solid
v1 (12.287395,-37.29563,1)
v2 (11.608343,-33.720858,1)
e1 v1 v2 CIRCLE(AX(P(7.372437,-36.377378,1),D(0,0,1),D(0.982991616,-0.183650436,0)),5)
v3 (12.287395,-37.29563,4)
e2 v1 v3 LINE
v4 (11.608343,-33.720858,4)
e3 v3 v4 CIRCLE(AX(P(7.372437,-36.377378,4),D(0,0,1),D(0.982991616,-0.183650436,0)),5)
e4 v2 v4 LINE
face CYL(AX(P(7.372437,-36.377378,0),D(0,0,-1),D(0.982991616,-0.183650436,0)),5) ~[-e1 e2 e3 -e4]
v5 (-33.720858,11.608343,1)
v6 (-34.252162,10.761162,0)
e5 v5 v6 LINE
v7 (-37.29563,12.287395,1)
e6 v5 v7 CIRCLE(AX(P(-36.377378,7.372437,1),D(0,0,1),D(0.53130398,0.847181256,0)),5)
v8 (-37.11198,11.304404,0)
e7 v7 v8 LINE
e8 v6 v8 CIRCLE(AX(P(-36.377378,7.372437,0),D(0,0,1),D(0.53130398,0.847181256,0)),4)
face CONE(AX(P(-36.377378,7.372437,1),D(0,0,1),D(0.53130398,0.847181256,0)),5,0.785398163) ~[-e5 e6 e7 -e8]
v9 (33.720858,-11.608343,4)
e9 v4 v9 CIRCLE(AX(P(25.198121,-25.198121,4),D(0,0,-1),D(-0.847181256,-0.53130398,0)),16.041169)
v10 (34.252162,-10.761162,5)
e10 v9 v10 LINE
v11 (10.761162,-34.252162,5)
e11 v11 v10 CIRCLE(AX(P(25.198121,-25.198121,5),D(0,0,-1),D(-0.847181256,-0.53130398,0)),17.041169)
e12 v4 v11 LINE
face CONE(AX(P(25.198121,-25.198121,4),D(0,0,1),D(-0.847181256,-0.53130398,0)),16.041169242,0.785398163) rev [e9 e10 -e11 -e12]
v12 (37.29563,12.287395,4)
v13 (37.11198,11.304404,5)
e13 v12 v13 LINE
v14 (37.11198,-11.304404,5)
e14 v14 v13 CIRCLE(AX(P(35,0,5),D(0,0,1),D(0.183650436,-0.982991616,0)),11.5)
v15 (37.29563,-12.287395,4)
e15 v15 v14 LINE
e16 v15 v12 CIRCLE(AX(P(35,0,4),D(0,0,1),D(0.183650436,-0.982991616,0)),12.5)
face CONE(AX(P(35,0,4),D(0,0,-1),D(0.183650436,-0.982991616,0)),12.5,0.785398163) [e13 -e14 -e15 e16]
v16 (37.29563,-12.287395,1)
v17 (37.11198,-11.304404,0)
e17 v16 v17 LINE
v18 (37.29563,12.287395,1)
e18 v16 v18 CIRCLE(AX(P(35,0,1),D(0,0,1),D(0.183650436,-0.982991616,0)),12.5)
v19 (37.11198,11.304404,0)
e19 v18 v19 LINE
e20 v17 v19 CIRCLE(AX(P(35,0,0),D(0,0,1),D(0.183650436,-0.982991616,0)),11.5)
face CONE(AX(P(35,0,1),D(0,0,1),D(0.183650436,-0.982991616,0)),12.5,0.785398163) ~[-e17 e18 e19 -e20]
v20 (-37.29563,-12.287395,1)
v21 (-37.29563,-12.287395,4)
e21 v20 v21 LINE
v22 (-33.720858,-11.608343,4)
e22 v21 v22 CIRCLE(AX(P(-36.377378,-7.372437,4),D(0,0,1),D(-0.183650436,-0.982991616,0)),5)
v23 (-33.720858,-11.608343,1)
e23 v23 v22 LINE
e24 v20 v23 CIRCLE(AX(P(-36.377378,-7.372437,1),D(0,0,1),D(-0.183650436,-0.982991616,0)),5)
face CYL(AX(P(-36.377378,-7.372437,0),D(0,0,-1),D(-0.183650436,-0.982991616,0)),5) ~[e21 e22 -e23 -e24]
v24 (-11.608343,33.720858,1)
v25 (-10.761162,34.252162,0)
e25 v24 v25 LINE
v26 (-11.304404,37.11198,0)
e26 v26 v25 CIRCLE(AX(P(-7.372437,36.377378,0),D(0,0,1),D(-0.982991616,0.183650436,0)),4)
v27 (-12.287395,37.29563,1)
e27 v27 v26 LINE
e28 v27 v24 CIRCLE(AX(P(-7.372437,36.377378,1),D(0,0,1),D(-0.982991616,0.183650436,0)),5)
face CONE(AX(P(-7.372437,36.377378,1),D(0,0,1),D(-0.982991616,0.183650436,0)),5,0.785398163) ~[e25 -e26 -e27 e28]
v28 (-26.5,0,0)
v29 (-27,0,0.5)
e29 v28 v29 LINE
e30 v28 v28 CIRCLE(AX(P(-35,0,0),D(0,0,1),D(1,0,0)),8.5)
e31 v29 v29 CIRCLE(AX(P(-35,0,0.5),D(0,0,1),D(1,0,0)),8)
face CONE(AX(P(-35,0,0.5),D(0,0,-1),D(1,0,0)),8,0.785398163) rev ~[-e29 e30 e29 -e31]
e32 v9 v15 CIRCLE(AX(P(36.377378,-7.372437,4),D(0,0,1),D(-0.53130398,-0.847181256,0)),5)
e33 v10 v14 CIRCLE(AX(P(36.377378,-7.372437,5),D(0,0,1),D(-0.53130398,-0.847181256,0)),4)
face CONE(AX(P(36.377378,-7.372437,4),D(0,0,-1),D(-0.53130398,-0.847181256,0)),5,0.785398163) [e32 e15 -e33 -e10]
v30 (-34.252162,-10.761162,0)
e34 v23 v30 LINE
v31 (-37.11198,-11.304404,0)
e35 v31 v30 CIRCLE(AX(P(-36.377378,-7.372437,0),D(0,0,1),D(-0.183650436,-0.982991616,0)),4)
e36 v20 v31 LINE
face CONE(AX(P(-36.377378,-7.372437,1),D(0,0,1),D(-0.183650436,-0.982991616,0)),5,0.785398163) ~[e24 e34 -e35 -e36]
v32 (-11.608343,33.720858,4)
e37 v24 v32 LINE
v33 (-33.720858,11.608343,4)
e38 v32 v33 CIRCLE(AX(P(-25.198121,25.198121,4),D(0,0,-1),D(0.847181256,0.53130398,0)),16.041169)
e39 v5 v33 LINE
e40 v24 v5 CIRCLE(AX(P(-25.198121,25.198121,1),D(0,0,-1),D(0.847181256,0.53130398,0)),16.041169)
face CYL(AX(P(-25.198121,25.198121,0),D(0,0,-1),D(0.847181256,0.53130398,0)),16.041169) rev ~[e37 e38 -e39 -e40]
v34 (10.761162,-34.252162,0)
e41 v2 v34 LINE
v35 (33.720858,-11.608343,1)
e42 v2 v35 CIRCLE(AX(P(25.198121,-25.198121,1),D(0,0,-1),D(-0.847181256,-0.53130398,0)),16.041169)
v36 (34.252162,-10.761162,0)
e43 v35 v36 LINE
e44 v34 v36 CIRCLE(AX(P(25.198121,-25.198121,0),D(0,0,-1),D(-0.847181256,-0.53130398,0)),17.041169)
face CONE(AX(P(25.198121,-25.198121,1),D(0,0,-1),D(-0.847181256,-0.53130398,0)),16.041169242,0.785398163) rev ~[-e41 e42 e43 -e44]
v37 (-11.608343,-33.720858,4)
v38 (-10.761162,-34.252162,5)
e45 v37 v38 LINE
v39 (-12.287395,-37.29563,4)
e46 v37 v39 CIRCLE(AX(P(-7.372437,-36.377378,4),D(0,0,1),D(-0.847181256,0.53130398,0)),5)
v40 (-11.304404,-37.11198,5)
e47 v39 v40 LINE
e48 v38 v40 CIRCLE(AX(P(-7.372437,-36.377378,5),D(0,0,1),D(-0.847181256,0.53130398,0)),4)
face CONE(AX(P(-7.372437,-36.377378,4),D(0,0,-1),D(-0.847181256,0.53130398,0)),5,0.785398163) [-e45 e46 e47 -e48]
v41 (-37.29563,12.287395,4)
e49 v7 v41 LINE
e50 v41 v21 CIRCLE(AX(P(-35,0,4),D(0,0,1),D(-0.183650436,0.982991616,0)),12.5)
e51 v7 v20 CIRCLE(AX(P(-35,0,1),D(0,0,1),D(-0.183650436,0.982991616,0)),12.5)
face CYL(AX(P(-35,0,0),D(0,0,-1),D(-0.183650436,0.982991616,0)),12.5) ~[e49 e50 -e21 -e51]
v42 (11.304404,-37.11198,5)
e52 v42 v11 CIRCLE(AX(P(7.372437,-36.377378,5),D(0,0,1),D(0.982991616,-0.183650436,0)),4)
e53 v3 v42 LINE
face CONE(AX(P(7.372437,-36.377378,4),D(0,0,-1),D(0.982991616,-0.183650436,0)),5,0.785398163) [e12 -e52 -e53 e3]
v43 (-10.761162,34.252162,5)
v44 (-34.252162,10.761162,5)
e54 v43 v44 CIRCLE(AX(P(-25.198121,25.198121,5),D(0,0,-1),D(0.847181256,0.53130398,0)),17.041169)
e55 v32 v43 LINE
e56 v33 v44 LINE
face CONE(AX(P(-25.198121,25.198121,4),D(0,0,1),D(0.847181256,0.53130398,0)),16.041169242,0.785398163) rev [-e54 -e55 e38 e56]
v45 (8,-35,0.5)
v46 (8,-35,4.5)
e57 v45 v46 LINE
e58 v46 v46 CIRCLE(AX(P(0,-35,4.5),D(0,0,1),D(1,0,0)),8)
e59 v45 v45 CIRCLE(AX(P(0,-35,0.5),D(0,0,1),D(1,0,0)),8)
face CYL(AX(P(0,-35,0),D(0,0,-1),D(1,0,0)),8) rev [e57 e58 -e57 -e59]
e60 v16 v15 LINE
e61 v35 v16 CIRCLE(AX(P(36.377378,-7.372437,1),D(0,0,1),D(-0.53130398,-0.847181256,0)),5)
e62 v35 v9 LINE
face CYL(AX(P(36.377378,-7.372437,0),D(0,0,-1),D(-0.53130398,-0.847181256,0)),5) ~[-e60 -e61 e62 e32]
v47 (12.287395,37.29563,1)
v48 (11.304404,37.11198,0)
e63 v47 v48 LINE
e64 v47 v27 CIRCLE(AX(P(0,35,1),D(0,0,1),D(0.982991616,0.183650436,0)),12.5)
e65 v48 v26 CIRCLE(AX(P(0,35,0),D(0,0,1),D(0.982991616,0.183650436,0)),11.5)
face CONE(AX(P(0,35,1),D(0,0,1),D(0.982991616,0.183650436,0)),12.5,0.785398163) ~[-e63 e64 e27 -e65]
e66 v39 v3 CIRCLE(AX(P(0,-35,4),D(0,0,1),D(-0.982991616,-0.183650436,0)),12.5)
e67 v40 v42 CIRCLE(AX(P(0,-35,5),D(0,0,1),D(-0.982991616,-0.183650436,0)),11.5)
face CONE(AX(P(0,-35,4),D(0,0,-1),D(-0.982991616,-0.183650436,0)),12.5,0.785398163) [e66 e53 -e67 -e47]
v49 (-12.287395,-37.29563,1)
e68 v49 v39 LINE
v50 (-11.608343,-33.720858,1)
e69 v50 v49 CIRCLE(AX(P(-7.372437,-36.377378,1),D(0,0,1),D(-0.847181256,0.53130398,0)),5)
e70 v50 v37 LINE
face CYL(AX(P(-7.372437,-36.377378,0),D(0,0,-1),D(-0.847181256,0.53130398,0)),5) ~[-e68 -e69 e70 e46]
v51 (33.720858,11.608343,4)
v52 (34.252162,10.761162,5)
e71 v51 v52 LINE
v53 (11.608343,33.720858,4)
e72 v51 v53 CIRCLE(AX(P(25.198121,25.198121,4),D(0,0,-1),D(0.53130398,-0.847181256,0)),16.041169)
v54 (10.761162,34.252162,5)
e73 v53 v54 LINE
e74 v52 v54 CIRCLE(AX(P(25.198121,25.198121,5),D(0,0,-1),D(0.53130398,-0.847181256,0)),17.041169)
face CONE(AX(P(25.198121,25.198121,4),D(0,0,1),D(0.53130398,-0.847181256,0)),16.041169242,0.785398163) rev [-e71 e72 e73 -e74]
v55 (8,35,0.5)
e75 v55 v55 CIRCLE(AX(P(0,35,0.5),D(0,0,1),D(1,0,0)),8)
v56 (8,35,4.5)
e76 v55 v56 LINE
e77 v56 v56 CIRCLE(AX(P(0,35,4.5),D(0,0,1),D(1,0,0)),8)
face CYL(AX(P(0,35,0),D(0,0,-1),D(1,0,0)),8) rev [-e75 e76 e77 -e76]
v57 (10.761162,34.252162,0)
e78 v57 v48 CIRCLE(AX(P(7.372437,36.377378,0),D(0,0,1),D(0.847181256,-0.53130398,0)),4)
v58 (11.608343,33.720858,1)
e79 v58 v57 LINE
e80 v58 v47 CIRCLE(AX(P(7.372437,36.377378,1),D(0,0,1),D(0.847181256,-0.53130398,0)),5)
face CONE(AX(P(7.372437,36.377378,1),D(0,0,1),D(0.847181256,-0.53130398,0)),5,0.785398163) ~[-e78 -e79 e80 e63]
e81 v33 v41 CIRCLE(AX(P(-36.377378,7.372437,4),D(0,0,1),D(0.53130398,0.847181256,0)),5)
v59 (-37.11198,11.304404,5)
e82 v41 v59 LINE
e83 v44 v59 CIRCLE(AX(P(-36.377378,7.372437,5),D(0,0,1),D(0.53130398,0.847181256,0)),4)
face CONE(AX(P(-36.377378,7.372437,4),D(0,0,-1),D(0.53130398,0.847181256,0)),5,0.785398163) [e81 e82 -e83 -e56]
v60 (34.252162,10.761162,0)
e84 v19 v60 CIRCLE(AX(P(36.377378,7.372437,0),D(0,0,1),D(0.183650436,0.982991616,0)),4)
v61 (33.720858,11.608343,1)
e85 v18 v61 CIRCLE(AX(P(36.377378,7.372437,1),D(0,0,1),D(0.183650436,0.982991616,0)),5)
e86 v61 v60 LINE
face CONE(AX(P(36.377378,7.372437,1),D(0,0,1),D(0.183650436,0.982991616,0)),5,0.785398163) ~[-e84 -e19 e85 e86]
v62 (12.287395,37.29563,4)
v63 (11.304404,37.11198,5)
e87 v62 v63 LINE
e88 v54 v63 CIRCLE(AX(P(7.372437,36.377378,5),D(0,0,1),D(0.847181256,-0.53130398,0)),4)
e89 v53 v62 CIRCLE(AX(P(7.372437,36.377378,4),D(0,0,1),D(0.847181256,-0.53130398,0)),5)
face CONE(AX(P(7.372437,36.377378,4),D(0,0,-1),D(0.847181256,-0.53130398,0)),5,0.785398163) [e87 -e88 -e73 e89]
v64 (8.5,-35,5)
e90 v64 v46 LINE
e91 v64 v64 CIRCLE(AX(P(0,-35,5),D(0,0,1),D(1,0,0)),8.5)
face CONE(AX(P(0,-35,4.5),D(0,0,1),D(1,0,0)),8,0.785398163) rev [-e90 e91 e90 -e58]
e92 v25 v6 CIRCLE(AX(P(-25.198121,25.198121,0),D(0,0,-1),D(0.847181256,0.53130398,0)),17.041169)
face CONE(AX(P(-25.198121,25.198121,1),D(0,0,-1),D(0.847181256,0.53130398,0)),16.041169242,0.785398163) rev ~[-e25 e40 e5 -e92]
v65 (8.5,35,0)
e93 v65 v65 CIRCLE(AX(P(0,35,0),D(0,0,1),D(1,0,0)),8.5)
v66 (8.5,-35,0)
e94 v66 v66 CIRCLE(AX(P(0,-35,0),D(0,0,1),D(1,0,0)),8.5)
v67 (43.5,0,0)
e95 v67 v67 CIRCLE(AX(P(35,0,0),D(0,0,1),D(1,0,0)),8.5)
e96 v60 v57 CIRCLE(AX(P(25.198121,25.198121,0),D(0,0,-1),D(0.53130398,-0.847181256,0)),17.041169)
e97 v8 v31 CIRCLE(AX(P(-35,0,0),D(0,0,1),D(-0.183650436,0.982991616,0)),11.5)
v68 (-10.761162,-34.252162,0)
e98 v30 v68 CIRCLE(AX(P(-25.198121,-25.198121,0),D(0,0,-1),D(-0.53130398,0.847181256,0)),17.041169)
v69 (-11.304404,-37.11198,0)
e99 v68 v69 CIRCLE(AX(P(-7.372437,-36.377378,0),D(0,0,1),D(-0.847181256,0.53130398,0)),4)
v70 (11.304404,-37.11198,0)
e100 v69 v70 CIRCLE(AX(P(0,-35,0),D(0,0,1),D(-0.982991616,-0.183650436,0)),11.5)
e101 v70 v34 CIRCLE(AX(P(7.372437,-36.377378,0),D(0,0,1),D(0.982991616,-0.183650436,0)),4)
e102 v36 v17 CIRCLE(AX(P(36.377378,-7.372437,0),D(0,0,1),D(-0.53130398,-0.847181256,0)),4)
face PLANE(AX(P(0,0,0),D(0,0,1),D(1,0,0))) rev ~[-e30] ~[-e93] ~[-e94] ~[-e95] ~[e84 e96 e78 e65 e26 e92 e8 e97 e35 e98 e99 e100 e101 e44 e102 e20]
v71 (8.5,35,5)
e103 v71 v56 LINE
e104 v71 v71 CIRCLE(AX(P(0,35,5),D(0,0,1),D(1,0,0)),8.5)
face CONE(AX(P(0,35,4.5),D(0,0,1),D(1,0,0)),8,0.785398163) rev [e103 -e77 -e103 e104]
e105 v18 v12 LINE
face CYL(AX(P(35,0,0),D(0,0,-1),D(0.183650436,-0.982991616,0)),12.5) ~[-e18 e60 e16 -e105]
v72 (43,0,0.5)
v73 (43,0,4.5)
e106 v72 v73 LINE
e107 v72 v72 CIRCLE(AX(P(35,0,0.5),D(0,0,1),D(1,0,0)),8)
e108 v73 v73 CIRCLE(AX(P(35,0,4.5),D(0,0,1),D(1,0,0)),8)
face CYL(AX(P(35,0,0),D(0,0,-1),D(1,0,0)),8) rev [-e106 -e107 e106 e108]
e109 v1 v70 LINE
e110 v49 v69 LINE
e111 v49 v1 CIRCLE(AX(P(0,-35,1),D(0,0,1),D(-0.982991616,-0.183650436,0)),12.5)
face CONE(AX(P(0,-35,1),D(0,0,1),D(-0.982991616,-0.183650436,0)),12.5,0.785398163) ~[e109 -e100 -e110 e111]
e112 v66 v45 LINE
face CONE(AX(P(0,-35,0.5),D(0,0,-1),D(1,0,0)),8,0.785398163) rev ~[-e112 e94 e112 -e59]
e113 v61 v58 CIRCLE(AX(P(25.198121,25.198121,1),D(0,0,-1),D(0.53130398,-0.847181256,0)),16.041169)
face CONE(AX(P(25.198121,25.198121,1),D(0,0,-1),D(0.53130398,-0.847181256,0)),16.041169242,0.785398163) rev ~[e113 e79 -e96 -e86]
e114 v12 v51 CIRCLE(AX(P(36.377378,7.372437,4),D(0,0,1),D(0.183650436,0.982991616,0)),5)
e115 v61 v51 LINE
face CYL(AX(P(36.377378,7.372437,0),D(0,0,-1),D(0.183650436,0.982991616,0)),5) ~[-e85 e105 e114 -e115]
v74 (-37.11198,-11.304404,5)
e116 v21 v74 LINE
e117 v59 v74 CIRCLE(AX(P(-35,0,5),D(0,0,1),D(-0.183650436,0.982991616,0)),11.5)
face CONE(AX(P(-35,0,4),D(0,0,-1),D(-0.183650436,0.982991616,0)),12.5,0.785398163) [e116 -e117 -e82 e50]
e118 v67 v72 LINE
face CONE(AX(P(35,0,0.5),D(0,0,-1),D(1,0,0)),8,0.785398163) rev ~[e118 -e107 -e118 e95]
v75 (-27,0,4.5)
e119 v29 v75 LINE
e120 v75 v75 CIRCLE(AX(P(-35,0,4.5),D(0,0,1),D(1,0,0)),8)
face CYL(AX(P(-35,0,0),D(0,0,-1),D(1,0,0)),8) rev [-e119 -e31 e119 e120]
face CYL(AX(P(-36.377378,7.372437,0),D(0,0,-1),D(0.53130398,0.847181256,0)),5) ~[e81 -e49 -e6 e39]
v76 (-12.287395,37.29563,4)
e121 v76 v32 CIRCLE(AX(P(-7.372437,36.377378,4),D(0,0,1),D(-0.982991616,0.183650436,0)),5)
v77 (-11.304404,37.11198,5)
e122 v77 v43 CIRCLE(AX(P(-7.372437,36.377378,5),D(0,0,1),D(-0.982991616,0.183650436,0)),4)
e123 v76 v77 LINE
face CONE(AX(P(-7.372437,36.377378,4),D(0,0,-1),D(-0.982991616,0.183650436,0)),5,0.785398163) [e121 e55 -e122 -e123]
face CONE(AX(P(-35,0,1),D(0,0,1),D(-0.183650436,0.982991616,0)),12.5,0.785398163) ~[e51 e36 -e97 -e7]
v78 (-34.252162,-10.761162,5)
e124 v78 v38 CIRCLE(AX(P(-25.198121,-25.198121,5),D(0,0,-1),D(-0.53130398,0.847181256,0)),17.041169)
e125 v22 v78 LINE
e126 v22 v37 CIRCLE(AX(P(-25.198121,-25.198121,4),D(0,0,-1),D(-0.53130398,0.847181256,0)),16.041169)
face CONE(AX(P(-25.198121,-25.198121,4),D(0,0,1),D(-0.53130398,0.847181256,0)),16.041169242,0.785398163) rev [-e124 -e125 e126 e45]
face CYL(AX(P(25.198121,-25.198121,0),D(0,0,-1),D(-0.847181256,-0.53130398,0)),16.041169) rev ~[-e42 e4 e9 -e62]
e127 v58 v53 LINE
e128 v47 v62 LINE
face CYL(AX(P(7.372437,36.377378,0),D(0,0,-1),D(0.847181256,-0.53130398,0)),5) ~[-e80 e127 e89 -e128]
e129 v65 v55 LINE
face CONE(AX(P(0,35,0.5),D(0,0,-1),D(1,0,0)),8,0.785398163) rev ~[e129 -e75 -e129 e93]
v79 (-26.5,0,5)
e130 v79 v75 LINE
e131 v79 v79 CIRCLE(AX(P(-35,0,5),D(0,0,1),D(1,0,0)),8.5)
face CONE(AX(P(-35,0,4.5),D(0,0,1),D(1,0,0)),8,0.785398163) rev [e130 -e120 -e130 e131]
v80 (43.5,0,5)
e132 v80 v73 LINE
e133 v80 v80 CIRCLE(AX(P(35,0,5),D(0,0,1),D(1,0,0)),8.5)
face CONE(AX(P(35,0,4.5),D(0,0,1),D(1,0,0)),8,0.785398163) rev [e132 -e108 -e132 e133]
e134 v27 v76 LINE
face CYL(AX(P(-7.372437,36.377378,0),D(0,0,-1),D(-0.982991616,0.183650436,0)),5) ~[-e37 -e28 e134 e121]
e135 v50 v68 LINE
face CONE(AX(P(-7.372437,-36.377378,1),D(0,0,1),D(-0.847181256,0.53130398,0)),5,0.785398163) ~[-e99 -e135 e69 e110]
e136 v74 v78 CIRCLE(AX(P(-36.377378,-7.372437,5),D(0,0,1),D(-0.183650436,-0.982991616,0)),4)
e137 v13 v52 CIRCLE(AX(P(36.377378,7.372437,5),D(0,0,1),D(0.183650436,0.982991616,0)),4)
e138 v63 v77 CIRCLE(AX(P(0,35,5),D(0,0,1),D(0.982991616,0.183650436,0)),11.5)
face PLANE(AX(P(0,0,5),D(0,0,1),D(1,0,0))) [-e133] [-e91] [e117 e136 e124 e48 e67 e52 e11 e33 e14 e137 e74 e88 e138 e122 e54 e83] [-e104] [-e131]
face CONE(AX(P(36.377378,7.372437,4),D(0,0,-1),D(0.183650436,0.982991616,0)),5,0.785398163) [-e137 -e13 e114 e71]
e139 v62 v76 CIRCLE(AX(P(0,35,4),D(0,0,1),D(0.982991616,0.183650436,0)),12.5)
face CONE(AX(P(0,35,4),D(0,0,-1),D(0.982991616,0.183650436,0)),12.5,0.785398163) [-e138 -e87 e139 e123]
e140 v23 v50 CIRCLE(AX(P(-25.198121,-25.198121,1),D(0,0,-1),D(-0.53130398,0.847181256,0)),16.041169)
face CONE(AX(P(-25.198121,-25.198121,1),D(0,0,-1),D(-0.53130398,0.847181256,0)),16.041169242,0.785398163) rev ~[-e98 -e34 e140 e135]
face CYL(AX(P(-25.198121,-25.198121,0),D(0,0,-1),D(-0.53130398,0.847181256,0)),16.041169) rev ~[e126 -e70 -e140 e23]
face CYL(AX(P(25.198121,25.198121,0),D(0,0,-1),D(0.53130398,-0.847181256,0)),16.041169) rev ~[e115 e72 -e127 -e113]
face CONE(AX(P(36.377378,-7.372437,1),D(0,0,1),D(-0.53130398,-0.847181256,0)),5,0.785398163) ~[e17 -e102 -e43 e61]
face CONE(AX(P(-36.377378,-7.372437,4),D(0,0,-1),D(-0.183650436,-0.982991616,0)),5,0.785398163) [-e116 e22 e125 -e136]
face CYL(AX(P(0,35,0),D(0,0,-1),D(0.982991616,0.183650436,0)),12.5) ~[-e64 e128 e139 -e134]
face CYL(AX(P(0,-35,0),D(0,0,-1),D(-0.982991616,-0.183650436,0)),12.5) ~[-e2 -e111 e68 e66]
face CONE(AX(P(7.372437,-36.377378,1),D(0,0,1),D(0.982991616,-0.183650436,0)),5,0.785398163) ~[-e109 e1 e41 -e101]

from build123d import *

# Parameters (mm, degrees)
F0_R     = 8
F1_DEPTH = 5
F2_SIZE  = 1
F3_SIZE  = 0.5


# Not quite as in the source:
# - a feature names something its author has since deleted; it is built from what else it names


with BuildPart() as f1:
    # F0 (on Top) → F1 (new body)
    with BuildSketch(Plane.XY):
        with BuildLine():
            ThreePointArc((11.6083434008, 33.7208583728), (12.2845984061, 35.4442804748), (12.2873952004, 37.2956304556))
            ThreePointArc((12.2873952004, 37.2956304556), (0, 47.5), (-12.2873952004, 37.2956304556))
            ThreePointArc((-12.2873952004, 37.2956304556), (-12.2845984061, 35.4442804748), (-11.6083434008, 33.7208583728))
            ThreePointArc((-11.6083434008, 33.7208583728), (-13.8553017596, 13.8553017596), (-33.7208583728, 11.6083434008))
            ThreePointArc((-33.7208583728, 11.6083434008), (-35.4442804748, 12.2845984061), (-37.2956304556, 12.2873952004))
            ThreePointArc((-37.2956304556, 12.2873952004), (-47.5, 0), (-37.2956304556, -12.2873952004))
            ThreePointArc((-37.2956304556, -12.2873952004), (-35.4442804748, -12.2845984061), (-33.7208583728, -11.6083434008))
            ThreePointArc((-33.7208583728, -11.6083434008), (-13.8553017596, -13.8553017596), (-11.6083434008, -33.7208583728))
            ThreePointArc((-11.6083434008, -33.7208583728), (-12.2845984061, -35.4442804748), (-12.2873952004, -37.2956304556))
            ThreePointArc((-12.2873952004, -37.2956304556), (0, -47.5), (12.2873952004, -37.2956304556))
            ThreePointArc((12.2873952004, -37.2956304556), (12.2845984061, -35.4442804748), (11.6083434008, -33.7208583728))
            ThreePointArc((11.6083434008, -33.7208583728), (13.8553017596, -13.8553017596), (33.7208583728, -11.6083434008))
            ThreePointArc((33.7208583728, -11.6083434008), (35.4442804748, -12.2845984061), (37.2956304556, -12.2873952004))
            ThreePointArc((37.2956304556, -12.2873952004), (47.5, 0), (37.2956304556, 12.2873952004))
            ThreePointArc((37.2956304556, 12.2873952004), (35.4442804748, 12.2845984061), (33.7208583728, 11.6083434008))
            ThreePointArc((33.7208583728, 11.6083434008), (13.8553017596, 13.8553017596), (11.6083434008, 33.7208583728))
        make_face()
        with Locations((0, -35)):
            Circle(F0_R, mode=Mode.SUBTRACT)
        with Locations((-35, 0)):
            Circle(F0_R, mode=Mode.SUBTRACT)
        with Locations((35, 0)):
            Circle(F0_R, mode=Mode.SUBTRACT)
        with Locations((0, 35)):
            Circle(F0_R, mode=Mode.SUBTRACT)
    extrude(amount=F1_DEPTH)

    # F2
    f2_edges = [f1.edges().sort_by_distance(p)[0] for p in [
        (-47.5, 0, 5),
        (-13.855302, -13.855302, 5),
        (-13.855302, 13.855302, 5),
        (0, 47.5, 5),
        (13.855302, 13.855302, 5),
        (47.5, 0, 5),
        (13.855302, -13.855302, 5),
        (0, -47.5, 5),
        (13.855302, 13.855302, 0),
        (0, 47.5, 0),
        (-13.855302, 13.855302, 0),
        (-47.5, 0, 0),
        (-13.855302, -13.855302, 0),
        (0, -47.5, 0),
        (13.855302, -13.855302, 0),
        (47.5, 0, 0),
    ]]
    chamfer(f2_edges, length=F2_SIZE)

    # F3
    f3_edges = [f1.edges().sort_by_distance(p)[0] for p in [
        (-8, 35, 5),
        (-8, -35, 5),
        (27, 0, 5),
        (-43, 0, 5),
        (-8, 35, 0),
        (-43, 0, 0),
        (27, 0, 0),
        (-8, -35, 0),
    ]]
    chamfer(f3_edges, length=F3_SIZE)


solid = f1.part
